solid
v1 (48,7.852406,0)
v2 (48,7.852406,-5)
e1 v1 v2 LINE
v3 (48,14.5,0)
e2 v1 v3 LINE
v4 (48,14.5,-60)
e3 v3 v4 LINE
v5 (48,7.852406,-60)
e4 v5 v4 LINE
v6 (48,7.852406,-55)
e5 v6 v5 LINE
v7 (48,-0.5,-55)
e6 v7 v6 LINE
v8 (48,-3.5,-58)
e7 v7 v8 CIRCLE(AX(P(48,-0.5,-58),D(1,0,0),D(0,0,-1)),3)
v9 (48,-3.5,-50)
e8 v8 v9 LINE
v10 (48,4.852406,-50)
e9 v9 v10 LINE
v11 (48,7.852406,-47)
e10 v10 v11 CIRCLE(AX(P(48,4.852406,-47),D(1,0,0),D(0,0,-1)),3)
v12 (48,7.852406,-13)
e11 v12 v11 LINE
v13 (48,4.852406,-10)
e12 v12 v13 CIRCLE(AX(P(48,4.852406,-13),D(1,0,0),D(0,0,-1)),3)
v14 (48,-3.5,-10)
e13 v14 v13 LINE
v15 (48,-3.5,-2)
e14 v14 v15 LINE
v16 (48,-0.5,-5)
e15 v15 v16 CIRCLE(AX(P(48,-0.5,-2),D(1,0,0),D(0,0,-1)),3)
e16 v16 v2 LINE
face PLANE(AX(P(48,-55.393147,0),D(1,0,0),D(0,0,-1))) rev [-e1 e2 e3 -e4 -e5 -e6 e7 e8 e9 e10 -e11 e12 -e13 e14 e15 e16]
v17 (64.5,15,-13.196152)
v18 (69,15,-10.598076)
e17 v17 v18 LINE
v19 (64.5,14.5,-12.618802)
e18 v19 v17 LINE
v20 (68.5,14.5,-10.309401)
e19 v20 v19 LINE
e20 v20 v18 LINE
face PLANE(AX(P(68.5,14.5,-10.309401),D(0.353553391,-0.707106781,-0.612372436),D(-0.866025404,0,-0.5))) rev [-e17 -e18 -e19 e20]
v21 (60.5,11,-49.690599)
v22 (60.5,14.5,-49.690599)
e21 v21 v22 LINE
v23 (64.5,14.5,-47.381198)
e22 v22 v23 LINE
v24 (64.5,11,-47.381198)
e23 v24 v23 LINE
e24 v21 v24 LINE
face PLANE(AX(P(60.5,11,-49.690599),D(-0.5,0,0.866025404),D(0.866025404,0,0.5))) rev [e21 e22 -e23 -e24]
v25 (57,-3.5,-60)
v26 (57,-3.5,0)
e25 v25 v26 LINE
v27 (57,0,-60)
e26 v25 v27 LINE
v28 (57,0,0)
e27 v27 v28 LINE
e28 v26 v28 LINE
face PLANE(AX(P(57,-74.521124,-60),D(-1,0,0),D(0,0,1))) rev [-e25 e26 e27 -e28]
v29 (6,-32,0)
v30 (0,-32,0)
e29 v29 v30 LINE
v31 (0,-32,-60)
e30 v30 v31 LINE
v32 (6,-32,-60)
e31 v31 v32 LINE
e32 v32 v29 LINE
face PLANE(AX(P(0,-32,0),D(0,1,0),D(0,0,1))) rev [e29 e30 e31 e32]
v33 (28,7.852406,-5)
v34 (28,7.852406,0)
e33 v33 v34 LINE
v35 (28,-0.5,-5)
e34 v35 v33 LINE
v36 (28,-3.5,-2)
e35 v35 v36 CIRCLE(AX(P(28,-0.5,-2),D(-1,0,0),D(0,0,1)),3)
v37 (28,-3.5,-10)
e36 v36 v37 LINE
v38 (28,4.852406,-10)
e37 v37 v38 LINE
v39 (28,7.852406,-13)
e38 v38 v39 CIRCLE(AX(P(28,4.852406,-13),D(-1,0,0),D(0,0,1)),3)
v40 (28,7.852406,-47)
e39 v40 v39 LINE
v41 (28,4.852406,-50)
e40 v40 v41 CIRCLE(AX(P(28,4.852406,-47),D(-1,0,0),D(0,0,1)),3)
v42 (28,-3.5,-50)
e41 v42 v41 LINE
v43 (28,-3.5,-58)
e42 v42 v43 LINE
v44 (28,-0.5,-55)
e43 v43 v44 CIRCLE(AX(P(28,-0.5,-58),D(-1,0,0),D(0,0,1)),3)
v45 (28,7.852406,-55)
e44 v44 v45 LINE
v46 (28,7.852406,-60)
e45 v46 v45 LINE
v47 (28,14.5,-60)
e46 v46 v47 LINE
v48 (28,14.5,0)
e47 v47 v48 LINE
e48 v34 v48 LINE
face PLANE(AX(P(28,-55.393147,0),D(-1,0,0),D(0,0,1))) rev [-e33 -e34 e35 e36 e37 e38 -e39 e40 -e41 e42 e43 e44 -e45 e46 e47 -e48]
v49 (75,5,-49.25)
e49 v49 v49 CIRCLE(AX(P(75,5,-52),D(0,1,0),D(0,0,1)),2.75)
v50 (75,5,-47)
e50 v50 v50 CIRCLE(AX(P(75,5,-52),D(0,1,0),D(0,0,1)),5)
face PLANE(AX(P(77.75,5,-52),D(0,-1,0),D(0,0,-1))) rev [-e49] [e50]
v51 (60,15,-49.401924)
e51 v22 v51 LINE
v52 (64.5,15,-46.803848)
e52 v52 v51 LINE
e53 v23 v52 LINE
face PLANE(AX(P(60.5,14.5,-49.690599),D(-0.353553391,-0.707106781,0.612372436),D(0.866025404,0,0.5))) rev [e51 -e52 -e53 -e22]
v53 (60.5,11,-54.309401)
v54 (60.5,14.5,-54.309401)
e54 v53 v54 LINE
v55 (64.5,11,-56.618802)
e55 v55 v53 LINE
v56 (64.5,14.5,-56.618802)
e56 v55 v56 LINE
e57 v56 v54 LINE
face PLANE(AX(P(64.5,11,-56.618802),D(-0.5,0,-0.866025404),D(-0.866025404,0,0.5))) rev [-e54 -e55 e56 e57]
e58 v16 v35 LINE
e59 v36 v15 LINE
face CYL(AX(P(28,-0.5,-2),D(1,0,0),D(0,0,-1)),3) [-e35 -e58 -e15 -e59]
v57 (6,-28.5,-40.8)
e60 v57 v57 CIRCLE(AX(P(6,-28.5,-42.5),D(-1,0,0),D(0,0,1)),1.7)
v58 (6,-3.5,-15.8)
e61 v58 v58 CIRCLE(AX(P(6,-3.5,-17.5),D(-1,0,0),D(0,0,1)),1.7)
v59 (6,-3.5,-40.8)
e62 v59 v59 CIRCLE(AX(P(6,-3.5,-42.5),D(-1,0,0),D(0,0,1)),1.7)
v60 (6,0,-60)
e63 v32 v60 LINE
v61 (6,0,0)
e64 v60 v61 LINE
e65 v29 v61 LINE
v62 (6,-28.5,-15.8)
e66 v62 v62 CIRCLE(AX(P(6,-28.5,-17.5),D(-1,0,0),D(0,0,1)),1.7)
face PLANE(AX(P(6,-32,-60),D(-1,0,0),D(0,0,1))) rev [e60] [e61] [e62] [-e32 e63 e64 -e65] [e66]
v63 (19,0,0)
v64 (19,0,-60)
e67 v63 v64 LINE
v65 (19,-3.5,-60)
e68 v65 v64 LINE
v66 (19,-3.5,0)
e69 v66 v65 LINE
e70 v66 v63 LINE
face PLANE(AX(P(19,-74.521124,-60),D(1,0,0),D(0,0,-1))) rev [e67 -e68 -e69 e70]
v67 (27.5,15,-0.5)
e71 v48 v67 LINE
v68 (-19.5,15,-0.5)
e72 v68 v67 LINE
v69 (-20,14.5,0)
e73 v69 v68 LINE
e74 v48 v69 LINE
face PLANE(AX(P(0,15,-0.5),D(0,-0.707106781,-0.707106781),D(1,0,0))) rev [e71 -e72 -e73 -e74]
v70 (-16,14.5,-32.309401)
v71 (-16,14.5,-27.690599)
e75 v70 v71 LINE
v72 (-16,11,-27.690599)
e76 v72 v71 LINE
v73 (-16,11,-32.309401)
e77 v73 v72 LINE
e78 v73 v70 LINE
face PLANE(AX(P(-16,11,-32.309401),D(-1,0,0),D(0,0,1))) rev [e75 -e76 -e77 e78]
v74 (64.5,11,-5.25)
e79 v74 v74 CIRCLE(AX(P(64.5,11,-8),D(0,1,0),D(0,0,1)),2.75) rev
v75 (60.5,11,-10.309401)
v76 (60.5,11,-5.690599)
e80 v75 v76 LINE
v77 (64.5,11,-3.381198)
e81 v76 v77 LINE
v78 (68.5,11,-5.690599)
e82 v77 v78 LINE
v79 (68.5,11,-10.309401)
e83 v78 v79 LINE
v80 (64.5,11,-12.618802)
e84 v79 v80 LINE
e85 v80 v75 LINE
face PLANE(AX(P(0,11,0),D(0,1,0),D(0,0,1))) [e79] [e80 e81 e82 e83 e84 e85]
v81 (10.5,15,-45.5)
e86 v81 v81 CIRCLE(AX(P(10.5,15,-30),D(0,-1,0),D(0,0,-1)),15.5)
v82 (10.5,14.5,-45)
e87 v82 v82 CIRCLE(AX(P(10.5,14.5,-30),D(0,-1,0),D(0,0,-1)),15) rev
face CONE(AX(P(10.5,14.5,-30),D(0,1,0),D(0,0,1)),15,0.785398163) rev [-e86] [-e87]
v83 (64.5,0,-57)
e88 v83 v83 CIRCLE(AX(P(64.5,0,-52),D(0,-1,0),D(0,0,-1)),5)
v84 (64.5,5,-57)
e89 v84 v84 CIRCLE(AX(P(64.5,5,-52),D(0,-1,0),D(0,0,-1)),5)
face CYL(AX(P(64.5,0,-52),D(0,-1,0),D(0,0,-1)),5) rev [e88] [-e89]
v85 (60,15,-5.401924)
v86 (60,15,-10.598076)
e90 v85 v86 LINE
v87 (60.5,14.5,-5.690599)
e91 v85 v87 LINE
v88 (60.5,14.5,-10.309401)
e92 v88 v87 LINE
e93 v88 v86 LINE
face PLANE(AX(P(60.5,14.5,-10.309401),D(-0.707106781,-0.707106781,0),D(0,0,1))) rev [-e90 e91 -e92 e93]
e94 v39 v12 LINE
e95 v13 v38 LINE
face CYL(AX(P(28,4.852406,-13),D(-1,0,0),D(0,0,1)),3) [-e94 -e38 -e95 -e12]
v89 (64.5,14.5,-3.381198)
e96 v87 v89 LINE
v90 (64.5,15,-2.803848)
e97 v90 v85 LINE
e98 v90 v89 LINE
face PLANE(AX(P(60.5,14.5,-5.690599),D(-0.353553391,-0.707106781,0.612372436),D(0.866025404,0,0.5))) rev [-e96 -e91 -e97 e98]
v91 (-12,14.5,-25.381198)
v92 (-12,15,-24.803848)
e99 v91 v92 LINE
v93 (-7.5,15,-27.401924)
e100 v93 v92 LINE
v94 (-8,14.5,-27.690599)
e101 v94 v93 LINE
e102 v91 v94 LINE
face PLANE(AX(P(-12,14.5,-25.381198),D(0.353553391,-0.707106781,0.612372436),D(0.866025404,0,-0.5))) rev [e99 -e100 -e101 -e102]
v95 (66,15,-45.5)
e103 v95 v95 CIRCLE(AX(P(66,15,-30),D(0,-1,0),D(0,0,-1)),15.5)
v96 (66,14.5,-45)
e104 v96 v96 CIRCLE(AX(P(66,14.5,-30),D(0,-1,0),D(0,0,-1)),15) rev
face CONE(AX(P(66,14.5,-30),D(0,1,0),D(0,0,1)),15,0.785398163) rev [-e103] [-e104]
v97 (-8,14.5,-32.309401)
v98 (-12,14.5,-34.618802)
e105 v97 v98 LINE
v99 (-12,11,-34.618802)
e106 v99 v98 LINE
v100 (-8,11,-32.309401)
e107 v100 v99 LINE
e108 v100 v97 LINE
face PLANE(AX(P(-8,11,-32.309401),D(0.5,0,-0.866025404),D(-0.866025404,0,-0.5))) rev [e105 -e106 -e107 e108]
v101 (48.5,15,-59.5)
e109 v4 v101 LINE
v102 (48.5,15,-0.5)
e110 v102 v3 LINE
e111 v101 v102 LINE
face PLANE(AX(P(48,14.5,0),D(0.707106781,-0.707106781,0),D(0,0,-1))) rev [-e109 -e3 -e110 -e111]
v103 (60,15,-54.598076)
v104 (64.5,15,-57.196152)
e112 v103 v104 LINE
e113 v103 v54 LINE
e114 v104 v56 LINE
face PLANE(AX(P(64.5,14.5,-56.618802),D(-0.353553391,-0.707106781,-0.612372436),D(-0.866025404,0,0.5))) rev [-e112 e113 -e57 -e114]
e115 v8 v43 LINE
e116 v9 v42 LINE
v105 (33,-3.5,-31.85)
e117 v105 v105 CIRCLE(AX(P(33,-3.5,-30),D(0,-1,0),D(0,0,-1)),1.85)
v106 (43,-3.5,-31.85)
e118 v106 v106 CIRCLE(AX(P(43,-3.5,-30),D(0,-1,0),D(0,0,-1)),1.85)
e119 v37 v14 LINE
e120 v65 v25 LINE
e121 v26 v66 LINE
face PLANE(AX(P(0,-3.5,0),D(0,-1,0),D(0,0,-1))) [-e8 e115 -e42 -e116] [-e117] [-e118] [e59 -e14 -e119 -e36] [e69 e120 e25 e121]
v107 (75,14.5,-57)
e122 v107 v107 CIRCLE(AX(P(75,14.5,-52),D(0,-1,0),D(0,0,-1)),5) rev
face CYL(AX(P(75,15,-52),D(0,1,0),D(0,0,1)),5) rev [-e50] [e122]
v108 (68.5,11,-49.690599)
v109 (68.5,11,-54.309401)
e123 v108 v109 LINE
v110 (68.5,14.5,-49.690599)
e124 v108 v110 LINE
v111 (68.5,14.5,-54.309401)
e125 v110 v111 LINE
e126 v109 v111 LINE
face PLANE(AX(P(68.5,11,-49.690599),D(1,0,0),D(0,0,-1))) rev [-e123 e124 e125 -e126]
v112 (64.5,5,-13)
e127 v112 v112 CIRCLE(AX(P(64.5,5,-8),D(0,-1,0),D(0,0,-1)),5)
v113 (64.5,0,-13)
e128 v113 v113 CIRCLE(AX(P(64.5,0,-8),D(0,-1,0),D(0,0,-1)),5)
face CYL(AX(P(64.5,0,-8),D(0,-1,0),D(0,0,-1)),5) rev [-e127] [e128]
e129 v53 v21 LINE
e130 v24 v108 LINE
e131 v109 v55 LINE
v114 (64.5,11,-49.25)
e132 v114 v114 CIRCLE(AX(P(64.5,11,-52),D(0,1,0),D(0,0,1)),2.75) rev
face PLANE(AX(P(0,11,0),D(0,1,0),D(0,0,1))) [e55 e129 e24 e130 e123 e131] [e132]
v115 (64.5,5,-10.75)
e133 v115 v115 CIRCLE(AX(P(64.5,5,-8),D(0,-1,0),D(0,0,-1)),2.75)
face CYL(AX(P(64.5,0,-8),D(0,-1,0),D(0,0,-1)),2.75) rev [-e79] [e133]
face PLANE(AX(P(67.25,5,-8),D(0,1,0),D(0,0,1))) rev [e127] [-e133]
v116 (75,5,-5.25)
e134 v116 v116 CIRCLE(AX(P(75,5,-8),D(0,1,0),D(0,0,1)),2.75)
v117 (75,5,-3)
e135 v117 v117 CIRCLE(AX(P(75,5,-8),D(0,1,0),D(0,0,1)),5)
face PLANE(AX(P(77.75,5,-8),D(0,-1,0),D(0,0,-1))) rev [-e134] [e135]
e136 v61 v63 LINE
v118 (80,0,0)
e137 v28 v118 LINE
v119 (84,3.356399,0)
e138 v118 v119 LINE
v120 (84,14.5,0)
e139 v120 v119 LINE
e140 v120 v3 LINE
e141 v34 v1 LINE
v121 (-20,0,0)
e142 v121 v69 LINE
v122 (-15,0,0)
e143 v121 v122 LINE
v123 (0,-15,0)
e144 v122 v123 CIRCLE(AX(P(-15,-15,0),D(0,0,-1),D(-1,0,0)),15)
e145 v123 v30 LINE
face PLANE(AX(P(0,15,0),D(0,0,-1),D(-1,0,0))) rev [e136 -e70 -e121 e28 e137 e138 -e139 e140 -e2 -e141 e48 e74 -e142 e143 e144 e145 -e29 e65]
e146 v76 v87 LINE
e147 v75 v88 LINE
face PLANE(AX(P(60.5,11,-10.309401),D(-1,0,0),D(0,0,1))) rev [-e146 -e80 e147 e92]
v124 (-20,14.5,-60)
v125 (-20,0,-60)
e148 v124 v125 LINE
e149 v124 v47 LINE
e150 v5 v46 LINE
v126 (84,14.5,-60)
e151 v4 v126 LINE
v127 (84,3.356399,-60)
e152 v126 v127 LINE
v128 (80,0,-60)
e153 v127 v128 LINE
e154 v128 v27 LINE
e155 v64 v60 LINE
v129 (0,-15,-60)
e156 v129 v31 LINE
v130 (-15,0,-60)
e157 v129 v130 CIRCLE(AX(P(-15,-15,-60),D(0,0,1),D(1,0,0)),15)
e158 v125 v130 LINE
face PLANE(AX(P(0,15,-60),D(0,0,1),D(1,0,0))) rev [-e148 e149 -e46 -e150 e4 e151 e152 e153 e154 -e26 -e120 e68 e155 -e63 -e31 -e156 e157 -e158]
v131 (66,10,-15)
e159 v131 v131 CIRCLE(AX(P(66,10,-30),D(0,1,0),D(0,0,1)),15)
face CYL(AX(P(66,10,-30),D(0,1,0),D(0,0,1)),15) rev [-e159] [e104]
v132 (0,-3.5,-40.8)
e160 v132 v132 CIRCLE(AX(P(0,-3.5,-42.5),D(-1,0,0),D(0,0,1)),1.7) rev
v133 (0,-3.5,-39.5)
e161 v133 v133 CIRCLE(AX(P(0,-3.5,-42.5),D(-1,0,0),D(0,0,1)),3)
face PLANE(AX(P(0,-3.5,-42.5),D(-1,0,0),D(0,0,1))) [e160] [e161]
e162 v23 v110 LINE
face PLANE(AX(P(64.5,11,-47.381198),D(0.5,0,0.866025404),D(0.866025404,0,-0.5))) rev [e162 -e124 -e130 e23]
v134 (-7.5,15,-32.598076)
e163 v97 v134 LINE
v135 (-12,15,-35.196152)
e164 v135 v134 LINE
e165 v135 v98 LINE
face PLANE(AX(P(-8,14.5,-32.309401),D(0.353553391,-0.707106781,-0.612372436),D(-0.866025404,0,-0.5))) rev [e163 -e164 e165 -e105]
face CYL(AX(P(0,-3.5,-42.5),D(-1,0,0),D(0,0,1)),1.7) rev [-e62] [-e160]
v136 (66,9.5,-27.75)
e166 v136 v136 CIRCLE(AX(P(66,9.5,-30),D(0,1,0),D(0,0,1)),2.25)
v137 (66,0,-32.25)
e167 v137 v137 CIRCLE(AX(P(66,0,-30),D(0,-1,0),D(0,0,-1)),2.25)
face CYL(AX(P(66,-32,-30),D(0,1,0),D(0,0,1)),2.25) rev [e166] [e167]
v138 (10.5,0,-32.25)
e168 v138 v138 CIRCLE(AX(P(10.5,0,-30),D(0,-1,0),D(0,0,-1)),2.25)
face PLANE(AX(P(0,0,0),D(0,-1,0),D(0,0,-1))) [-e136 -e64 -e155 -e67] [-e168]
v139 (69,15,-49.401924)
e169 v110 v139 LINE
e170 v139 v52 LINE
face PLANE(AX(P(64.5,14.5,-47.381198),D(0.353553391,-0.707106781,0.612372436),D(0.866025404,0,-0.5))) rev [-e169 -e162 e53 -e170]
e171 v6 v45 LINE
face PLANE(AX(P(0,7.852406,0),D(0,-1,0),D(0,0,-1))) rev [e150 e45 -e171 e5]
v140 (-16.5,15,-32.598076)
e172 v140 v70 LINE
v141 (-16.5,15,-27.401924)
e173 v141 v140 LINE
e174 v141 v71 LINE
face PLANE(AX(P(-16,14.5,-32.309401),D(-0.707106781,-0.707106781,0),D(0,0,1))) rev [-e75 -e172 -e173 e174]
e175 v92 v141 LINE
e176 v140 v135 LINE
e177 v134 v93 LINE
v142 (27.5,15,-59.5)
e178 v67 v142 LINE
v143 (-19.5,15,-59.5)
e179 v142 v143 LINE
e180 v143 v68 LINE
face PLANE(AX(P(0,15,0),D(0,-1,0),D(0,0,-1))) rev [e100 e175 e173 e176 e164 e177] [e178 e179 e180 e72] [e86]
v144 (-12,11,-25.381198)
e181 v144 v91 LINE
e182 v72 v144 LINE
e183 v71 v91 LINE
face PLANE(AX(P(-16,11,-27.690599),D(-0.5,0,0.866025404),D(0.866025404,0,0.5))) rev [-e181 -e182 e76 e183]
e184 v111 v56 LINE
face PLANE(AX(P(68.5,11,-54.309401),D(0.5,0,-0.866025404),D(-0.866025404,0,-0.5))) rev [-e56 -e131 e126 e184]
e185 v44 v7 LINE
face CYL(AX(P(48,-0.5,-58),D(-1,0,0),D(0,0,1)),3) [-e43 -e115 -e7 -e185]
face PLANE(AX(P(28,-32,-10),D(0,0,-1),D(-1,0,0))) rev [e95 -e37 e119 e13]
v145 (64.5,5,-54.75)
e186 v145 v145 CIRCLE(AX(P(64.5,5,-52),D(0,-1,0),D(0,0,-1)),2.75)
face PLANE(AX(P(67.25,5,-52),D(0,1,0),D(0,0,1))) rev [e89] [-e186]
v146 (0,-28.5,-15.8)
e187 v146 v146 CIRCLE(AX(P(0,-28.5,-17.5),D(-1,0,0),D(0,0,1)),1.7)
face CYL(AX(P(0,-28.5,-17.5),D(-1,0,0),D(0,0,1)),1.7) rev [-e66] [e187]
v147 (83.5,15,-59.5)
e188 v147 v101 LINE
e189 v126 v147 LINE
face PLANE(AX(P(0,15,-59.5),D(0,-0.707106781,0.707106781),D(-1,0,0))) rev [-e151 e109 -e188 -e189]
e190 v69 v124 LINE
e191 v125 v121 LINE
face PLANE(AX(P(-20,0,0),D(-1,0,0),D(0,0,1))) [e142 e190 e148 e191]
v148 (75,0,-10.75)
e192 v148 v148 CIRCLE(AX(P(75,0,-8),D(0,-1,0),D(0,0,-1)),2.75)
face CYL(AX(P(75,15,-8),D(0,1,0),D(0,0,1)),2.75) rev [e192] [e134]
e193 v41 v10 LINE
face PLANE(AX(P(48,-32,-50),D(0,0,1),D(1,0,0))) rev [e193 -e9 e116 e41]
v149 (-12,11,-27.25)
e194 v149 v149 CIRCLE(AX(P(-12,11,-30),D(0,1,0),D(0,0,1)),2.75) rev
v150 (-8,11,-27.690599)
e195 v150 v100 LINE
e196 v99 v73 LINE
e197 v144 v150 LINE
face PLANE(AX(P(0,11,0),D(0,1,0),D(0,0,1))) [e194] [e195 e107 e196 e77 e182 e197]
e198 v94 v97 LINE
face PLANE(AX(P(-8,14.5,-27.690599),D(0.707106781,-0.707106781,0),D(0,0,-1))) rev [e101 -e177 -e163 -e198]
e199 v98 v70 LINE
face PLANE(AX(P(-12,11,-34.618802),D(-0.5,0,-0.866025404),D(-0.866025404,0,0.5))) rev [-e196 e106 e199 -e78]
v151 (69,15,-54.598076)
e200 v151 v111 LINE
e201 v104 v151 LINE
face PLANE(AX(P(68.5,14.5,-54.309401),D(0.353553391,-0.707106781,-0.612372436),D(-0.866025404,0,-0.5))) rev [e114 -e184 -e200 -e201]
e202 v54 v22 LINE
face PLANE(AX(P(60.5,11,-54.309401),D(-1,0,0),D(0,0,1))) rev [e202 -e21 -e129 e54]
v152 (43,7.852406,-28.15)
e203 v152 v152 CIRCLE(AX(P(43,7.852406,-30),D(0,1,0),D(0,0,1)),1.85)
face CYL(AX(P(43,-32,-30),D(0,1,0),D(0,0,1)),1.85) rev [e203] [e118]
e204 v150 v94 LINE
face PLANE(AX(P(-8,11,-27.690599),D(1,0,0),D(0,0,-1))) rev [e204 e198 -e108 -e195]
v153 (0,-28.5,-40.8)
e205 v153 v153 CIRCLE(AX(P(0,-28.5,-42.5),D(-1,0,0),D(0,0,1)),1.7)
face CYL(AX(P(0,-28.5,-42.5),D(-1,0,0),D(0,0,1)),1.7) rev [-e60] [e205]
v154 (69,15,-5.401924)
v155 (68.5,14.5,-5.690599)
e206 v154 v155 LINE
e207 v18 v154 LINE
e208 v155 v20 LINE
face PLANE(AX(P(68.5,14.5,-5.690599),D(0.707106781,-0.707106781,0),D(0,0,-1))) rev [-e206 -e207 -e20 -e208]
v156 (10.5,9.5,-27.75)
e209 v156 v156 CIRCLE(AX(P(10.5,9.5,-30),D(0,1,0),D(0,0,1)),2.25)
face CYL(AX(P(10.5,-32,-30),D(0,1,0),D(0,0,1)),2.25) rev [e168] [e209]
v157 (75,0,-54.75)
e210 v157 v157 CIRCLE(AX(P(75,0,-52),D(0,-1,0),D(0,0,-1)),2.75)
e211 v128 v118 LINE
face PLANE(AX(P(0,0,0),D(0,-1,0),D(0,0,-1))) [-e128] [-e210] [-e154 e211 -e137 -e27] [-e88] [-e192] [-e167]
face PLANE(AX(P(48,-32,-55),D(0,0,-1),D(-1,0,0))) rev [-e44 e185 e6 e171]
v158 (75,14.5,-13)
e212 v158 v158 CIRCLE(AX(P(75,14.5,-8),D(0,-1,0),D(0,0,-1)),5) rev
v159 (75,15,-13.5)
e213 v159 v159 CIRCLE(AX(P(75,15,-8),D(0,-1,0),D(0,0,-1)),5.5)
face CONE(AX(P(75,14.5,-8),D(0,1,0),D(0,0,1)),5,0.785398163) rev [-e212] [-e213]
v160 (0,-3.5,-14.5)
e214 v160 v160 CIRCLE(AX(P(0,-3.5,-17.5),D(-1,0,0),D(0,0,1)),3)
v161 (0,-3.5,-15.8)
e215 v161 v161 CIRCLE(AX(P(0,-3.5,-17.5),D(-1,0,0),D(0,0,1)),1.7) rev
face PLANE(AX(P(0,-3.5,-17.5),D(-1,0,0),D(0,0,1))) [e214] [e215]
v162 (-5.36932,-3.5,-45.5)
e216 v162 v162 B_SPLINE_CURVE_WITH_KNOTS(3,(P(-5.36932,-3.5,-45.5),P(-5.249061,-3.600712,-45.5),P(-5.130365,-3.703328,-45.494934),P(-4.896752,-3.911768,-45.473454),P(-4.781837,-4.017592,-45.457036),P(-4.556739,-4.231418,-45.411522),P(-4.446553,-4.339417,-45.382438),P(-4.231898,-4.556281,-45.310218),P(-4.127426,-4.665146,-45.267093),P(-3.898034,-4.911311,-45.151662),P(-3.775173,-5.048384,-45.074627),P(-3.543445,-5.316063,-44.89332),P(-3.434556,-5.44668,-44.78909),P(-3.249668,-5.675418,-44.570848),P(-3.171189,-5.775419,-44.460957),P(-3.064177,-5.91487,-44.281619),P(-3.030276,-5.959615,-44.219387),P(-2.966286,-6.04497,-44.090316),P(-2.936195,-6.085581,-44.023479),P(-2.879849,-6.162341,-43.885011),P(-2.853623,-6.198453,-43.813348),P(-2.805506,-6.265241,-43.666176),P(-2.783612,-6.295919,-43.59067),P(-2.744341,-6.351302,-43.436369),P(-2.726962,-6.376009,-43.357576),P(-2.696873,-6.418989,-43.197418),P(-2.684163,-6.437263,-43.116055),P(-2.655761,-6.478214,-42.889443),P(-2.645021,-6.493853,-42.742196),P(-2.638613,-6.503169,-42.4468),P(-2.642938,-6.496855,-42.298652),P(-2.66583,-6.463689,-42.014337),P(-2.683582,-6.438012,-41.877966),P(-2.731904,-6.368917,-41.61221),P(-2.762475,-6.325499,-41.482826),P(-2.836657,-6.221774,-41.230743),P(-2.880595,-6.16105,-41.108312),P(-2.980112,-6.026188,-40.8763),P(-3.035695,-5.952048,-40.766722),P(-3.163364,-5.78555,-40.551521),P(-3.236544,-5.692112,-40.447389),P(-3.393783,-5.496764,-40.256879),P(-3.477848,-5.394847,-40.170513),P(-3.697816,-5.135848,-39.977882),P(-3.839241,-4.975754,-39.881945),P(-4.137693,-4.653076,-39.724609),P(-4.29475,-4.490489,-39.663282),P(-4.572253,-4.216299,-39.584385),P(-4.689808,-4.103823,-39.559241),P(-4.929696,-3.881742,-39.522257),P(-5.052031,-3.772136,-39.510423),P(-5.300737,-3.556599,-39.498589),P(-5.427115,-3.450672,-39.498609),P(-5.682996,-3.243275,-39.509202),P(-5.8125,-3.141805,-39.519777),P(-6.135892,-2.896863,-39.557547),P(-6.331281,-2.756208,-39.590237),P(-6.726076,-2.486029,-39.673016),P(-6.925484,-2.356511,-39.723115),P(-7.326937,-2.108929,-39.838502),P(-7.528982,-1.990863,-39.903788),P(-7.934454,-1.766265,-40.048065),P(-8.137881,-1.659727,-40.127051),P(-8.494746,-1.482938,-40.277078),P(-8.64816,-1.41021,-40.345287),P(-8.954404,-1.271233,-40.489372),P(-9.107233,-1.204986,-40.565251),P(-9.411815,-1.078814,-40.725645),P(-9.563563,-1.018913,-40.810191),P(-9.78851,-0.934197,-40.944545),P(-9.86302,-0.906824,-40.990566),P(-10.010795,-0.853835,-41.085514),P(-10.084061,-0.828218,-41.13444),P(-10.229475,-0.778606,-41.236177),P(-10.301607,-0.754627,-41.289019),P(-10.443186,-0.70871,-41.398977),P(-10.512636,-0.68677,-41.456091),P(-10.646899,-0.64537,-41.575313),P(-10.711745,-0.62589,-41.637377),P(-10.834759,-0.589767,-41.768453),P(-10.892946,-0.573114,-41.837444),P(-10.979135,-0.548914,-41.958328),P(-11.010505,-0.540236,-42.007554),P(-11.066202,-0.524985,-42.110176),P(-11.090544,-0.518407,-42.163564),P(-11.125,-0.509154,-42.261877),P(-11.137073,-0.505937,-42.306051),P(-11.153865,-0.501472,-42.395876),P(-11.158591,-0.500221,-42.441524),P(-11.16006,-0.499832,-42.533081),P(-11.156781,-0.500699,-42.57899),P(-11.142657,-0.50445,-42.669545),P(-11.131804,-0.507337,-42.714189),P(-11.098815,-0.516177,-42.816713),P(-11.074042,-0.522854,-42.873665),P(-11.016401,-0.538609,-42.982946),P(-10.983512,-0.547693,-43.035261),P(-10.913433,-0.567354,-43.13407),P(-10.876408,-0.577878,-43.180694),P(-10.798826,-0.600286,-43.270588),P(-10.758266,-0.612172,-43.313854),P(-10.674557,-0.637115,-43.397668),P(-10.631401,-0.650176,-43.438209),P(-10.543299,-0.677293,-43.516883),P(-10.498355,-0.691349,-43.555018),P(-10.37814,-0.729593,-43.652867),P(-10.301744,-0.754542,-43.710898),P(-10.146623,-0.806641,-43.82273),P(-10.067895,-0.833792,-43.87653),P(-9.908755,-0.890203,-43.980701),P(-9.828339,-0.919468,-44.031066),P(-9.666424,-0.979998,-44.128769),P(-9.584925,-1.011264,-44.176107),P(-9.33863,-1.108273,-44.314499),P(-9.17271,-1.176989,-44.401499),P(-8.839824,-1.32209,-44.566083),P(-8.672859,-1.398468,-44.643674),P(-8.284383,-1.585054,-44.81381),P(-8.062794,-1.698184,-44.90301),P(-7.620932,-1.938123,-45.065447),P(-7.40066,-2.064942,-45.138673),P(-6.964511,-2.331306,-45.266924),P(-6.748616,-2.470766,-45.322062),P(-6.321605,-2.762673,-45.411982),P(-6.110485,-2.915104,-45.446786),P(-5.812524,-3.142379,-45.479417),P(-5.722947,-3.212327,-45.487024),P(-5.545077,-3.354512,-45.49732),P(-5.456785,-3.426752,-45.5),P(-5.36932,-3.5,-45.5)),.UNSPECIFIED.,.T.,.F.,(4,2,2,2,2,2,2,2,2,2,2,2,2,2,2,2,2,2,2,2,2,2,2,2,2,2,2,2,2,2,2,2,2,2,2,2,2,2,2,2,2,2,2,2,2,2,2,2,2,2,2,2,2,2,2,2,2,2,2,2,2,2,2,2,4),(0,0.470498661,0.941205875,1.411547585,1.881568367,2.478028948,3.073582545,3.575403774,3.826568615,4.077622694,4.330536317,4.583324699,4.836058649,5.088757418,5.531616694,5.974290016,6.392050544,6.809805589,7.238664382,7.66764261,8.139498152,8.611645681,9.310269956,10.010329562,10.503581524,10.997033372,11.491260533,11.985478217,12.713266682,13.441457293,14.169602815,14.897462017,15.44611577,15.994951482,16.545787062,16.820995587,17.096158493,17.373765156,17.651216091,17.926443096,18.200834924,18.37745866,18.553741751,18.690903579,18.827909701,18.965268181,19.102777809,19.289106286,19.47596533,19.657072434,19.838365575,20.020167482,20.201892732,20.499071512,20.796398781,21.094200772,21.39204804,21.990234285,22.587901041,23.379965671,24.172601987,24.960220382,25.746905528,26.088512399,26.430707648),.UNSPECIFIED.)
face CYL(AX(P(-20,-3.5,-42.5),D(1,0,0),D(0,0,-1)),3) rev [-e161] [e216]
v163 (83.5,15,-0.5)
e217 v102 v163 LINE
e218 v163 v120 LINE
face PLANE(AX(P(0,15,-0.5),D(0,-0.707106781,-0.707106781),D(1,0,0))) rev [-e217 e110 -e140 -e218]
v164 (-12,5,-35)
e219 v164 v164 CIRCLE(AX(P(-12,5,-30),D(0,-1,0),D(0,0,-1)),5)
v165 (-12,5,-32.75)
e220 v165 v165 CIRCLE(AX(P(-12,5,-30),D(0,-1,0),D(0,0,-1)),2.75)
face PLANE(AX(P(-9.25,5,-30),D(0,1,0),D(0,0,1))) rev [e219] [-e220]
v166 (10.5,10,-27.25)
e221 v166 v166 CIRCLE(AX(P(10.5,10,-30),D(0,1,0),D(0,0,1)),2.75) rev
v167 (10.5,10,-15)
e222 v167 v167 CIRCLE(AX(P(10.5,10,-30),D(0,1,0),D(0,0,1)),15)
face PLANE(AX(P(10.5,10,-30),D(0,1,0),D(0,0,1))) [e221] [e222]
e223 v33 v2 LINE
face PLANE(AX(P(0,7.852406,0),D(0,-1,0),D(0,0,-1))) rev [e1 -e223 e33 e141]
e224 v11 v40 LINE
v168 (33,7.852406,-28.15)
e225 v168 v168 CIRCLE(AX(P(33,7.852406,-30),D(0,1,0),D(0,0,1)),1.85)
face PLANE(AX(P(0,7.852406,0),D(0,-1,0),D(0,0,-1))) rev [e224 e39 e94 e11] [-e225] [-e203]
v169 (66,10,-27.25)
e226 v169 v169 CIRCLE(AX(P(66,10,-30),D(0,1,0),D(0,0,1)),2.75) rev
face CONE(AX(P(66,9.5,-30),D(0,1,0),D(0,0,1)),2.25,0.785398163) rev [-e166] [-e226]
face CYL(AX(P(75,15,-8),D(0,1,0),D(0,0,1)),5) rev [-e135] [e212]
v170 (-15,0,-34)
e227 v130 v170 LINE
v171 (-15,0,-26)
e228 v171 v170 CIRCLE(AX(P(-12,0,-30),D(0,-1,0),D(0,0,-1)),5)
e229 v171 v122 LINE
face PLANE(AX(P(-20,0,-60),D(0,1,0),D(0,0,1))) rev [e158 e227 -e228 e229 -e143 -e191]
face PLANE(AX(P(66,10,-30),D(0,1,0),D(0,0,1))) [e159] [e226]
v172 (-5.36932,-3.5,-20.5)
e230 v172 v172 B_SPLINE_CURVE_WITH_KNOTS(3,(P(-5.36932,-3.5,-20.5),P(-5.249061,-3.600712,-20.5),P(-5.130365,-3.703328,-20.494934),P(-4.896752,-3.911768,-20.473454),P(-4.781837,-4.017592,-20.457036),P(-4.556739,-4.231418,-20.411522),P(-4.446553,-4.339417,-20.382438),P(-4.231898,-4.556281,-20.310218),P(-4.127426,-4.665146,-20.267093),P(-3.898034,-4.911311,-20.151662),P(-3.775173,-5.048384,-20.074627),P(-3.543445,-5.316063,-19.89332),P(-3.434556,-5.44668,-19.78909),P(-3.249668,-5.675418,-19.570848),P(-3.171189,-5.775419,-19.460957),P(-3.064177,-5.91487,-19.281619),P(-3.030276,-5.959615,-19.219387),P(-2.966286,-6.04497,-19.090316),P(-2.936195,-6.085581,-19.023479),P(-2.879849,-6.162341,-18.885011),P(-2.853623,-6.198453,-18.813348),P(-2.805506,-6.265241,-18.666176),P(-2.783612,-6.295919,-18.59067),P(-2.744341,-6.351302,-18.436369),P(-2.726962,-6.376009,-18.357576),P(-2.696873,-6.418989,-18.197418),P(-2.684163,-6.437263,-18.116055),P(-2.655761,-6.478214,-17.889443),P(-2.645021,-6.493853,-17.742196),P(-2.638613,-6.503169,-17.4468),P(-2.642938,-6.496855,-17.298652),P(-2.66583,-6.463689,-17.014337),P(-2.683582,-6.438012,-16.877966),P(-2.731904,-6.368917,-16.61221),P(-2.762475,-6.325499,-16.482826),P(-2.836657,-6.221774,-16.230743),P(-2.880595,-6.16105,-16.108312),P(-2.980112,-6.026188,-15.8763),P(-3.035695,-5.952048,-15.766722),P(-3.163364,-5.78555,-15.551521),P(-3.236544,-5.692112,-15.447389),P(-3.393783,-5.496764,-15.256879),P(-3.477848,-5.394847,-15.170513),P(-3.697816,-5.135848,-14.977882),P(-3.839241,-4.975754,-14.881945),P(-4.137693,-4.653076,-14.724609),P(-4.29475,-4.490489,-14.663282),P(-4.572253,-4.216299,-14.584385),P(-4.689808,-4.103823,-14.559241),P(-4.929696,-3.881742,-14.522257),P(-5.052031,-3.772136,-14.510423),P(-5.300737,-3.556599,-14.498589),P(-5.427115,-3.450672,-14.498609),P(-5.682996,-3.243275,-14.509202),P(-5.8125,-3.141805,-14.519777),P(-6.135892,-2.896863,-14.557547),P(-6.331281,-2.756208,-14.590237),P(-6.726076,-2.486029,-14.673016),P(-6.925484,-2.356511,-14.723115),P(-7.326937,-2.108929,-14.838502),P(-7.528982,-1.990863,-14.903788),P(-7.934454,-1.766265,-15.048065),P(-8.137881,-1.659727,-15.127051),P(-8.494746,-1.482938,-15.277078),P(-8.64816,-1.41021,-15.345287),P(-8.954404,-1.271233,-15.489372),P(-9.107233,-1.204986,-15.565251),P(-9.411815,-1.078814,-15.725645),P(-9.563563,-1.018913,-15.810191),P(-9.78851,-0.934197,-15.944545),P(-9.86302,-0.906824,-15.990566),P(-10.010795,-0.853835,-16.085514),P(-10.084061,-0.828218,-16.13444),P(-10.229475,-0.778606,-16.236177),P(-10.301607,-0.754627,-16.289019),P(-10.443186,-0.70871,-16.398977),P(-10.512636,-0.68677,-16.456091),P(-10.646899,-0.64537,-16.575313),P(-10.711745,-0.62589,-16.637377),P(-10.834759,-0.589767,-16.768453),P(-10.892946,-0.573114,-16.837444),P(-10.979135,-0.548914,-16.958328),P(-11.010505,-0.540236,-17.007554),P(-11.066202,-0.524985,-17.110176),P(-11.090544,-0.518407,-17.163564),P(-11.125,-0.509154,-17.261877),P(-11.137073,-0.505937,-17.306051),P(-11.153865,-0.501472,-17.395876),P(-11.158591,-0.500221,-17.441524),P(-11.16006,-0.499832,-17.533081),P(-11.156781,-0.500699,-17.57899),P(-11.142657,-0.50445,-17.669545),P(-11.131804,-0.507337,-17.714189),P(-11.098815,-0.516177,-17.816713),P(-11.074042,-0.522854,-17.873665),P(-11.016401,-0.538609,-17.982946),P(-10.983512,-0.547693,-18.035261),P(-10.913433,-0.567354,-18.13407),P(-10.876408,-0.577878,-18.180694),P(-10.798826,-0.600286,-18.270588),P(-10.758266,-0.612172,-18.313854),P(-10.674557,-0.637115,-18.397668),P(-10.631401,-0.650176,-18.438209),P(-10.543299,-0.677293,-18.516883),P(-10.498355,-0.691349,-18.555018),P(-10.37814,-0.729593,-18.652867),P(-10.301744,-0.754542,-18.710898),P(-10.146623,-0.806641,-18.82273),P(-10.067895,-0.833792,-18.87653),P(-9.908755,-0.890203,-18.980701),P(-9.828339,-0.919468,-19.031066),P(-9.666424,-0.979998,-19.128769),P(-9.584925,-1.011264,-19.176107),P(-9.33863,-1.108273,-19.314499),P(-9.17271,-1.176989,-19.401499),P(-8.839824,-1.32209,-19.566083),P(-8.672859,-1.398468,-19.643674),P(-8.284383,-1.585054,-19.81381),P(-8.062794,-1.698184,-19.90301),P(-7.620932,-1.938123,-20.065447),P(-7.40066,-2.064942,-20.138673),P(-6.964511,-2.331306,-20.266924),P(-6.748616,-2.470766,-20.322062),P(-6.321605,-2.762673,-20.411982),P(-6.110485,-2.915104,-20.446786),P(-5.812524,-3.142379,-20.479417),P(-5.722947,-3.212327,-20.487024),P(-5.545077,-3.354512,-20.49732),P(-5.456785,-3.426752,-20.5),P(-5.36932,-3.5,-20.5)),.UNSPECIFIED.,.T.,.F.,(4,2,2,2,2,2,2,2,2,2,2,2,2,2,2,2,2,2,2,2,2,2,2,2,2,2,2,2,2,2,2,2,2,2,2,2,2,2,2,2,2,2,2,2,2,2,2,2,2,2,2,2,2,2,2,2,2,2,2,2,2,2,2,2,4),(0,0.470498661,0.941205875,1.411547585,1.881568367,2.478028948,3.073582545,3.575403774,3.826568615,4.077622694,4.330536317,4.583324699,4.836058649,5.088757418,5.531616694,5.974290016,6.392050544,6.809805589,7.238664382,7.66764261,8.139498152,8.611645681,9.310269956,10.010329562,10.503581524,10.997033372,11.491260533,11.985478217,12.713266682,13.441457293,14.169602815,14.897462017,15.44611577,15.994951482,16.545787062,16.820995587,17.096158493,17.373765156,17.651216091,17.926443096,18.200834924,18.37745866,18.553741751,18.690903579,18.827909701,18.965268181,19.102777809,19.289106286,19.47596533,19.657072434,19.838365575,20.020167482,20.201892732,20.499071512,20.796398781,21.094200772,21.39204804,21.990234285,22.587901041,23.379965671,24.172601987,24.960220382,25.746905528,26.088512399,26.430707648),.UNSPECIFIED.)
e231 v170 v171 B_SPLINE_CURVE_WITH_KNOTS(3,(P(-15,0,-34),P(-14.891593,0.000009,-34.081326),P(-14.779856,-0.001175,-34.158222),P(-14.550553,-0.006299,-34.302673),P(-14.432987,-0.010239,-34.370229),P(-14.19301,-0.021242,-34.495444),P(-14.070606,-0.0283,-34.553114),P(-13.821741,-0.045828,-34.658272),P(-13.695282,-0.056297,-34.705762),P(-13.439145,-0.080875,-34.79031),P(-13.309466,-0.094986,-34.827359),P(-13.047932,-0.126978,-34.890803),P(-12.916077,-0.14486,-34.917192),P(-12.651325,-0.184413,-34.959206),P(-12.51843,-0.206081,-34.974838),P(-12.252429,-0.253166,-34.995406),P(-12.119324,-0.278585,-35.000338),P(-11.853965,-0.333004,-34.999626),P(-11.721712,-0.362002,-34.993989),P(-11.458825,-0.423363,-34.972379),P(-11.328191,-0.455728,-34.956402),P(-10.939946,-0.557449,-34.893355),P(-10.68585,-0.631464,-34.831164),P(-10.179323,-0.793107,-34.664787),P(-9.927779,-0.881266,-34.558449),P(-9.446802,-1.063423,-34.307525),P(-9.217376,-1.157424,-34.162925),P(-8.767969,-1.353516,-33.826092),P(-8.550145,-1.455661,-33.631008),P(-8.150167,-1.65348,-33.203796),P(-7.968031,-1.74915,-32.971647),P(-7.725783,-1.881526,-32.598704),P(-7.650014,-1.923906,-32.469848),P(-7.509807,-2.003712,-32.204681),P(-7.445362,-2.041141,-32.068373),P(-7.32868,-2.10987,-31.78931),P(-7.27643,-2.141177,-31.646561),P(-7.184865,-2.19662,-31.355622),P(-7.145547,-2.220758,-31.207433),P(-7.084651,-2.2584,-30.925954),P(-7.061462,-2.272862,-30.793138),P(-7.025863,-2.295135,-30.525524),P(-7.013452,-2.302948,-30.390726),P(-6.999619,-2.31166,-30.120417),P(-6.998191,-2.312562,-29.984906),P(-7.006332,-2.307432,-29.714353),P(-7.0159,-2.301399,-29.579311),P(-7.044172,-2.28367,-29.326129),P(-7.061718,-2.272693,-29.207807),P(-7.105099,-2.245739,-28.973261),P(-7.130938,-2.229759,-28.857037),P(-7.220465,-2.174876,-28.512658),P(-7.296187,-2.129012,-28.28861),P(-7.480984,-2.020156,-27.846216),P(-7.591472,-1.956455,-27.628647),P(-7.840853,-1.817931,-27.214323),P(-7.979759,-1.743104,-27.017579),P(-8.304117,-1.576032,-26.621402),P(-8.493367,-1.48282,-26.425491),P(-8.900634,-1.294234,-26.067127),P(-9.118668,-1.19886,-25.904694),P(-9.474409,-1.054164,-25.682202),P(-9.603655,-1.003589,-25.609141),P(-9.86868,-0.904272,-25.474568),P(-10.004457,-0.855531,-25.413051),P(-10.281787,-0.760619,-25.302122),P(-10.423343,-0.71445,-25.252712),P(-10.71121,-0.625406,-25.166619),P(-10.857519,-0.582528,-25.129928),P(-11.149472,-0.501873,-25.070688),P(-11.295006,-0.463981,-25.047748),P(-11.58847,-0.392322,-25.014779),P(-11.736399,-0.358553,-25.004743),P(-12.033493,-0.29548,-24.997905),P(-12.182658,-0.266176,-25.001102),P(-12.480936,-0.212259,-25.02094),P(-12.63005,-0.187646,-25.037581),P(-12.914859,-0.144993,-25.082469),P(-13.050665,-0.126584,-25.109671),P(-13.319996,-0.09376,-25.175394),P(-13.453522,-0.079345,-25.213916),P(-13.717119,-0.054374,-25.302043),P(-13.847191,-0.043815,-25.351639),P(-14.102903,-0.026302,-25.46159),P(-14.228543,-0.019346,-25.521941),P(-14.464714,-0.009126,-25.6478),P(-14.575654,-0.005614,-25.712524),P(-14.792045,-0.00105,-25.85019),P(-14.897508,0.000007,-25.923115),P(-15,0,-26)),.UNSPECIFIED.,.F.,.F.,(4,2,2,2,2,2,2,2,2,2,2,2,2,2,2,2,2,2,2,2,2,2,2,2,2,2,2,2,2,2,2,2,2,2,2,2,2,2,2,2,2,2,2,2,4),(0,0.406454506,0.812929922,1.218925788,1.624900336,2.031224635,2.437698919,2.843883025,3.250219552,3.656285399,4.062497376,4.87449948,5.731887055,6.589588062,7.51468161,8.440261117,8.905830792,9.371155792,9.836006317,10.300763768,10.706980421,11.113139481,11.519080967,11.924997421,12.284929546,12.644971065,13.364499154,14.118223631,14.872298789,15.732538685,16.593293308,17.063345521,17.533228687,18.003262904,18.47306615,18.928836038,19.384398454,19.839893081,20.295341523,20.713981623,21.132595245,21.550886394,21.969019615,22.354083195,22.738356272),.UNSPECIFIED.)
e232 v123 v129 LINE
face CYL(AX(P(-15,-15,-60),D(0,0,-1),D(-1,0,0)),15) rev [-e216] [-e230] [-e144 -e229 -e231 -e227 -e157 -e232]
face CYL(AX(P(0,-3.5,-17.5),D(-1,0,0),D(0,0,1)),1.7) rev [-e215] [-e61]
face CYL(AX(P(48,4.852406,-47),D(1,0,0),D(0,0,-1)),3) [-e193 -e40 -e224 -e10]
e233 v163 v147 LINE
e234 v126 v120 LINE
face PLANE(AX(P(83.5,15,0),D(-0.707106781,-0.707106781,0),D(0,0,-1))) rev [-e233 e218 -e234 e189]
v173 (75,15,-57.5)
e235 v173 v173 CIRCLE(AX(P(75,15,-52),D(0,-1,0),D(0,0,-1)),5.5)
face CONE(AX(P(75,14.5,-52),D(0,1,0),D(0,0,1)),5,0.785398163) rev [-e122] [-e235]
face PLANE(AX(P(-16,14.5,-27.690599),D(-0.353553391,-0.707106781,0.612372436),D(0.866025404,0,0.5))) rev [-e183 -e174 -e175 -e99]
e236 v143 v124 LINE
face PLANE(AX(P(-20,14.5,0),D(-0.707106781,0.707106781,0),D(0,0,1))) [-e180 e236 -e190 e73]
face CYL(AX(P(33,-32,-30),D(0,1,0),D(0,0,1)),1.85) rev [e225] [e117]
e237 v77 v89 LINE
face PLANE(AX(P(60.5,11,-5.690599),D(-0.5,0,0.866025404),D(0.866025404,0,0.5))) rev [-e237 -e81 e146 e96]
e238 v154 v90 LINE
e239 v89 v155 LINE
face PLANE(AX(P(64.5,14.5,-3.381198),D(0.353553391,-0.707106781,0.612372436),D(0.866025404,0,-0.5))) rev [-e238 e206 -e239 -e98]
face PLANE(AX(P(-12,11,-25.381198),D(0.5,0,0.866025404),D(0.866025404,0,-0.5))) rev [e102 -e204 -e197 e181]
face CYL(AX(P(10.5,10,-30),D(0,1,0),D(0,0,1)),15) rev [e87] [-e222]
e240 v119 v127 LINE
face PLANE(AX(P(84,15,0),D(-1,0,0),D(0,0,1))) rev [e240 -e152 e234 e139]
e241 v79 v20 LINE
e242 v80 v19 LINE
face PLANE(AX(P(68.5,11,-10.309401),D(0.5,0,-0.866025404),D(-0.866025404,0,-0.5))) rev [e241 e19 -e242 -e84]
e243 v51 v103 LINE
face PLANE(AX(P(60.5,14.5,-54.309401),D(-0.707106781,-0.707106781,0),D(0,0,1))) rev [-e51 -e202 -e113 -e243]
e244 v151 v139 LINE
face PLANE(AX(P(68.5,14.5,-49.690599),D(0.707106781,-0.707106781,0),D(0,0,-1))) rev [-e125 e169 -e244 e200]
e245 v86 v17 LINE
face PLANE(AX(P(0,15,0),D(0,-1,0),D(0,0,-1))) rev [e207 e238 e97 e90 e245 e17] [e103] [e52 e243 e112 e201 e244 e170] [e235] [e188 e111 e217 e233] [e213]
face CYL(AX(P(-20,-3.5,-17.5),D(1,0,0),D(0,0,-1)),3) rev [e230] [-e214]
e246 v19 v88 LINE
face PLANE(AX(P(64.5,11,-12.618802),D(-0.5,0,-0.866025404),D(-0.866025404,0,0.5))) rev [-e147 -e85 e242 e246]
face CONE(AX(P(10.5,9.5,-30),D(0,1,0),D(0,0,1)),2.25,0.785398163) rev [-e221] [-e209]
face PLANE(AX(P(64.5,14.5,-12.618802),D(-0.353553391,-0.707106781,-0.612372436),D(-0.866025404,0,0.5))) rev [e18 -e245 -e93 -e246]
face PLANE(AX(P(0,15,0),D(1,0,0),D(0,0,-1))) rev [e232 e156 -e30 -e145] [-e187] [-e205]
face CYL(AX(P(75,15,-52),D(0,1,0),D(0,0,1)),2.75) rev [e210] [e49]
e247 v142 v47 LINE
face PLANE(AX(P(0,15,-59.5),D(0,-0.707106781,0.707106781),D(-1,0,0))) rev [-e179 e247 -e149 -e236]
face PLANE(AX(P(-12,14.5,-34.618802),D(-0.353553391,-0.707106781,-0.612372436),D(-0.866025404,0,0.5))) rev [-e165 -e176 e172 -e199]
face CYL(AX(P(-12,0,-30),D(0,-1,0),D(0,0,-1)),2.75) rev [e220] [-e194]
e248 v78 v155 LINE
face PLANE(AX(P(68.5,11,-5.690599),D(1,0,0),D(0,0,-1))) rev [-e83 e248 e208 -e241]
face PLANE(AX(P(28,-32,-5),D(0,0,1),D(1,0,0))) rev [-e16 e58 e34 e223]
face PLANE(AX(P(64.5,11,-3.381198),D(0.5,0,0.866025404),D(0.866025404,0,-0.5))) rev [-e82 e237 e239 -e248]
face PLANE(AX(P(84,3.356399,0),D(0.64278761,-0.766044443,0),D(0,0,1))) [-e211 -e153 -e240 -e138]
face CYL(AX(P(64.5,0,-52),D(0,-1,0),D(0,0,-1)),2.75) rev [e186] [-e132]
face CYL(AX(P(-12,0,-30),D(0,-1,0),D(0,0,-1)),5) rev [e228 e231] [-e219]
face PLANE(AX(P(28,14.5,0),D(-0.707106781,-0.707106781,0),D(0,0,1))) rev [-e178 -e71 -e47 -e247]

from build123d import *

# Parameters (mm, degrees)
SKETCH1_W                      = 84
SKETCH1_H                      = 60
BOSS_EXTRUDE1_DEPTH            = 15
SKETCH2_W                      = 6
SKETCH2_H                      = 60
BOSS_EXTRUDE2_DEPTH            = 32
M3_CLEARANCE_HOLE1_D           = 3.4
SKETCH7_W                      = 38
SKETCH7_H                      = 60
BOSS_EXTRUDE3_DEPTH            = 3.5
CUT_EXTRUDE5_START             = -7.147594
SKETCH26_W                     = 20
SKETCH26_H                     = 60
CUT_EXTRUDE5_DEPTH             = 7.147594
SKETCH30_W                     = 60
SKETCH30_H                     = 15
BOSS_EXTRUDE4_DEPTH            = 20
SKETCH27_W                     = 20
SKETCH27_H                     = 5
CUT_EXTRUDE6_DEPTH             = 111.653577801
FILLET1_R                      = 3
SKETCH28_R                     = 1.85
CUT_EXTRUDE7_DEPTH             = 111.653577801
CBORE_FOR_M5_SHCS2_D           = 5.5
CBORE_FOR_M5_SHCS2_CBORE_D     = 10
CBORE_FOR_M5_SHCS2_CBORE_DEPTH = 10
CHAMFER1_SIZE                  = 4
CHAMFER1_SIZE2                 = 3.356398525
CBORE_FOR_M5_SHCS3_D           = 5.5
CBORE_FOR_M5_SHCS3_CBORE_D     = 10
CBORE_FOR_M5_SHCS3_CBORE_DEPTH = 5
CUT_EXTRUDE8_DEPTH             = 4
CHAMFER2_SIZE                  = 0.5
SKETCH31_R                     = 15
CUT_EXTRUDE9_DEPTH             = 5
SKETCH32_R                     = 2.25
CUT_EXTRUDE10_DEPTH            = 112.445053726
CHAMFER3_SIZE                  = 0.5
FILLET2_R                      = 15
SKETCH33_R                     = 3
CUT_EXTRUDE11_DEPTH            = 109.074048744


with BuildPart() as part:
    # Sketch1 → Boss-Extrude1 (new body)
    with BuildSketch(Plane(origin=(0, 0, 0), x_dir=(1, 0, 0), z_dir=(0, 1, 0))):
        with Locations((42, 30)):
            Rectangle(SKETCH1_W, SKETCH1_H)
    extrude(amount=BOSS_EXTRUDE1_DEPTH)

    # Sketch2 → Boss-Extrude2 (add)
    with BuildSketch(Plane.XZ):
        with Locations((3, -30)):
            Rectangle(SKETCH2_W, SKETCH2_H)
    extrude(amount=BOSS_EXTRUDE2_DEPTH)

    # M3 Clearance Hole1 (through all)
    with Locations(Plane.ZY):
        with Locations((-42.5, -28.5), (-42.5, -3.5), (-17.5, -3.5), (-17.5, -28.5)):
            Hole(M3_CLEARANCE_HOLE1_D / 2)

    # Sketch7 → Boss-Extrude3 (add)
    with BuildSketch(Plane.XZ):
        with Locations((38, -30)):
            Rectangle(SKETCH7_W, SKETCH7_H)
    extrude(amount=BOSS_EXTRUDE3_DEPTH)

    # Sketch26 → Cut-Extrude5 (cut)
    with BuildSketch(Plane(origin=(0, 15, 0), x_dir=(1, 0, 0), z_dir=(0, 1, 0)).offset(CUT_EXTRUDE5_START)):
        with Locations((38, 30)):
            Rectangle(SKETCH26_W, SKETCH26_H)
    extrude(amount=CUT_EXTRUDE5_DEPTH, mode=Mode.SUBTRACT)

    # Sketch30 → Boss-Extrude4 (add)
    with BuildSketch(Plane.ZY):
        with Locations((-30, 7.5)):
            Rectangle(SKETCH30_W, SKETCH30_H)
    extrude(amount=BOSS_EXTRUDE4_DEPTH)

    # Sketch27 → Cut-Extrude6 (cut, through all)
    with BuildSketch(Plane(origin=(0, 7.852406202, 0), x_dir=(1, 0, 0), z_dir=(0, 1, 0))):
        with Locations((38, 7.5)):
            Rectangle(SKETCH27_W, SKETCH27_H)
        with Locations((38, 52.5)):
            Rectangle(SKETCH27_W, SKETCH27_H)
    extrude(amount=-CUT_EXTRUDE6_DEPTH, mode=Mode.SUBTRACT)

    # Fillet1
    fillet1_edges = [part.edges().sort_by_distance(p)[0] for p in [
        (38, -3.5, -5),
        (38, 7.852406202, -10),
        (38, -3.5, -55),
        (38, 7.852406202, -50),
    ]]
    fillet(fillet1_edges, radius=FILLET1_R)

    # Sketch28 → Cut-Extrude7 (cut, through all)
    with BuildSketch(Plane(origin=(0, 7.852406202, 0), x_dir=(1, 0, 0), z_dir=(0, 1, 0))):
        with Locations(Location((33, 30, 0), (0, 0, 270))):
            Circle(SKETCH28_R)
        with Locations(Location((43, 30, 0), (0, 0, 270))):
            Circle(SKETCH28_R)
    extrude(amount=-CUT_EXTRUDE7_DEPTH, mode=Mode.SUBTRACT)

    # CBORE for M5 SHCS2 (through all)
    with Locations(Plane(origin=(0, 15, 0), x_dir=(1, 0, 0), z_dir=(0, 1, 0))):
        with Locations((75, 52), (75, 8)):
            CounterBoreHole(CBORE_FOR_M5_SHCS2_D / 2, CBORE_FOR_M5_SHCS2_CBORE_D / 2, CBORE_FOR_M5_SHCS2_CBORE_DEPTH)

    # Chamfer1
    chamfer1_edges = [part.edges().sort_by_distance(p)[0] for p in [
        (84, 0, -30),
    ]]
    chamfer1_side = [part.faces().sort_by_distance(p)[0] for p in [
        (70.364021046, 0, -30),
    ]]
    chamfer(chamfer1_edges, length=CHAMFER1_SIZE, length2=CHAMFER1_SIZE2, reference=chamfer1_side[0])

    # CBORE for M5 SHCS3 (through all)
    with Locations(Plane(origin=(0, 0, 0), x_dir=(-1, 0, 0), z_dir=(0, -1, 0))):
        with Locations((-64.5, 52), (-64.5, 8), (12, 30)):
            CounterBoreHole(CBORE_FOR_M5_SHCS3_D / 2, CBORE_FOR_M5_SHCS3_CBORE_D / 2, CBORE_FOR_M5_SHCS3_CBORE_DEPTH)

    # Sketch20 → Cut-Extrude8 (cut)
    with BuildSketch(Plane(origin=(0, 15, 0), x_dir=(1, 0, 0), z_dir=(0, 1, 0))):
        Polygon((64.5, 12.618802154), (60.5, 10.309401077), (60.5, 5.690598923), (64.5, 3.381197846), (68.5, 5.690598923), (68.5, 10.309401077), align=None)
        Polygon((64.5, 47.381197846), (68.5, 49.690598923), (68.5, 54.309401077), (64.5, 56.618802154), (60.5, 54.309401077), (60.5, 49.690598923), align=None)
        Polygon((-8, 27.690598923), (-8, 32.309401077), (-12, 34.618802154), (-16, 32.309401077), (-16, 27.690598923), (-12, 25.381197846), align=None)
    extrude(amount=-CUT_EXTRUDE8_DEPTH, mode=Mode.SUBTRACT)

    # Chamfer2
    chamfer2_edges = [part.edges().sort_by_distance(p)[0] for p in [
        (84, 15, -30),
        (66, 15, -60),
        (70, 15, -8),
        (70, 15, -52),
        (66.5, 15, -11.464101615),
        (62.5, 15, -11.464101615),
        (60.5, 15, -8),
        (62.5, 15, -4.535898385),
        (66.5, 15, -4.535898385),
        (68.5, 15, -8),
        (62.5, 15, -48.535898385),
        (66.5, 15, -48.535898385),
        (68.5, 15, -52),
        (66.5, 15, -55.464101615),
        (62.5, 15, -55.464101615),
        (60.5, 15, -52),
        (-10, 15, -26.535898385),
        (-8, 15, -30),
        (-10, 15, -33.464101615),
        (-14, 15, -33.464101615),
        (-16, 15, -30),
        (-14, 15, -26.535898385),
        (66, 15, 0),
        (4, 15, -60),
        (28, 15, -30),
        (48, 15, -30),
        (-20, 15, -30),
        (4, 15, 0),
    ]]
    chamfer(chamfer2_edges, length=CHAMFER2_SIZE)

    # Sketch31 → Cut-Extrude9 (cut)
    with BuildSketch(Plane(origin=(0, 15, 0), x_dir=(1, 0, 0), z_dir=(0, 1, 0))):
        with Locations(Location((66, 30, 0), (0, 0, 270))):
            Circle(SKETCH31_R)
        with Locations(Location((10.5, 30, 0), (0, 0, 270))):
            Circle(SKETCH31_R)
    extrude(amount=-CUT_EXTRUDE9_DEPTH, mode=Mode.SUBTRACT)

    # Sketch32 → Cut-Extrude10 (cut, through all)
    with BuildSketch(Plane(origin=(0, 10, 0), x_dir=(1, 0, 0), z_dir=(0, 1, 0))):
        with Locations(Location((10.5, 30, 0), (0, 0, 270))):
            Circle(SKETCH32_R)
        with Locations(Location((66, 30, 0), (0, 0, 270))):
            Circle(SKETCH32_R)
    extrude(amount=-CUT_EXTRUDE10_DEPTH, mode=Mode.SUBTRACT)

    # Chamfer3
    chamfer3_edges = [part.edges().sort_by_distance(p)[0] for p in [
        (66, 15, -45),
        (10.5, 15, -45),
        (10.5, 10, -32.25),
        (66, 10, -32.25),
    ]]
    chamfer(chamfer3_edges, length=CHAMFER3_SIZE)

    # Fillet2
    # the kernel refuses this fillet: 15 mm, written as the material it adds along each edge
    with BuildSketch(Plane(origin=(0, 0, 0), x_dir=(-1, 0, 0), z_dir=(0, 0, -1))) as fillet2_piece_1_section:
        with BuildLine():
            CenterArc((FILLET2_R, -FILLET2_R), FILLET2_R, 90, 90)
            Line((0, -FILLET2_R), (0, 0))
            Line((0, 0), (FILLET2_R, 0))
        make_face()
    fillet2_piece_1 = extrude(amount=60, mode=Mode.PRIVATE)
    fillet2_piece_1 = fillet2_piece_1 - Plane(origin=(-12, -3.454719609, -30), x_dir=(-1, 0, 0), z_dir=(0, -1, 0)) * Cylinder(5, 180, mode=Mode.PRIVATE)
    fillet2_piece_1 = fillet2_piece_1 - Plane(origin=(-3.29371936, -3.5, -42.5), x_dir=(0, 0, -1), z_dir=(1, 0, 0)) * Cylinder(1.7, 180, mode=Mode.PRIVATE)
    fillet2_piece_1 = fillet2_piece_1 - Plane(origin=(-3.29371936, -3.5, -17.5), x_dir=(0, 0, -1), z_dir=(1, 0, 0)) * Cylinder(1.7, 180, mode=Mode.PRIVATE)
    add(fillet2_piece_1)

    # Sketch33 → Cut-Extrude11 (cut, through all)
    with BuildSketch(Plane.ZY):
        with Locations(Location((-17.5, -3.5, 0), (0, 0, 180))):
            Circle(SKETCH33_R)
        with Locations(Location((-42.5, -3.5, 0), (0, 0, 180))):
            Circle(SKETCH33_R)
    extrude(amount=CUT_EXTRUDE11_DEPTH, mode=Mode.SUBTRACT)


solid = part.part
